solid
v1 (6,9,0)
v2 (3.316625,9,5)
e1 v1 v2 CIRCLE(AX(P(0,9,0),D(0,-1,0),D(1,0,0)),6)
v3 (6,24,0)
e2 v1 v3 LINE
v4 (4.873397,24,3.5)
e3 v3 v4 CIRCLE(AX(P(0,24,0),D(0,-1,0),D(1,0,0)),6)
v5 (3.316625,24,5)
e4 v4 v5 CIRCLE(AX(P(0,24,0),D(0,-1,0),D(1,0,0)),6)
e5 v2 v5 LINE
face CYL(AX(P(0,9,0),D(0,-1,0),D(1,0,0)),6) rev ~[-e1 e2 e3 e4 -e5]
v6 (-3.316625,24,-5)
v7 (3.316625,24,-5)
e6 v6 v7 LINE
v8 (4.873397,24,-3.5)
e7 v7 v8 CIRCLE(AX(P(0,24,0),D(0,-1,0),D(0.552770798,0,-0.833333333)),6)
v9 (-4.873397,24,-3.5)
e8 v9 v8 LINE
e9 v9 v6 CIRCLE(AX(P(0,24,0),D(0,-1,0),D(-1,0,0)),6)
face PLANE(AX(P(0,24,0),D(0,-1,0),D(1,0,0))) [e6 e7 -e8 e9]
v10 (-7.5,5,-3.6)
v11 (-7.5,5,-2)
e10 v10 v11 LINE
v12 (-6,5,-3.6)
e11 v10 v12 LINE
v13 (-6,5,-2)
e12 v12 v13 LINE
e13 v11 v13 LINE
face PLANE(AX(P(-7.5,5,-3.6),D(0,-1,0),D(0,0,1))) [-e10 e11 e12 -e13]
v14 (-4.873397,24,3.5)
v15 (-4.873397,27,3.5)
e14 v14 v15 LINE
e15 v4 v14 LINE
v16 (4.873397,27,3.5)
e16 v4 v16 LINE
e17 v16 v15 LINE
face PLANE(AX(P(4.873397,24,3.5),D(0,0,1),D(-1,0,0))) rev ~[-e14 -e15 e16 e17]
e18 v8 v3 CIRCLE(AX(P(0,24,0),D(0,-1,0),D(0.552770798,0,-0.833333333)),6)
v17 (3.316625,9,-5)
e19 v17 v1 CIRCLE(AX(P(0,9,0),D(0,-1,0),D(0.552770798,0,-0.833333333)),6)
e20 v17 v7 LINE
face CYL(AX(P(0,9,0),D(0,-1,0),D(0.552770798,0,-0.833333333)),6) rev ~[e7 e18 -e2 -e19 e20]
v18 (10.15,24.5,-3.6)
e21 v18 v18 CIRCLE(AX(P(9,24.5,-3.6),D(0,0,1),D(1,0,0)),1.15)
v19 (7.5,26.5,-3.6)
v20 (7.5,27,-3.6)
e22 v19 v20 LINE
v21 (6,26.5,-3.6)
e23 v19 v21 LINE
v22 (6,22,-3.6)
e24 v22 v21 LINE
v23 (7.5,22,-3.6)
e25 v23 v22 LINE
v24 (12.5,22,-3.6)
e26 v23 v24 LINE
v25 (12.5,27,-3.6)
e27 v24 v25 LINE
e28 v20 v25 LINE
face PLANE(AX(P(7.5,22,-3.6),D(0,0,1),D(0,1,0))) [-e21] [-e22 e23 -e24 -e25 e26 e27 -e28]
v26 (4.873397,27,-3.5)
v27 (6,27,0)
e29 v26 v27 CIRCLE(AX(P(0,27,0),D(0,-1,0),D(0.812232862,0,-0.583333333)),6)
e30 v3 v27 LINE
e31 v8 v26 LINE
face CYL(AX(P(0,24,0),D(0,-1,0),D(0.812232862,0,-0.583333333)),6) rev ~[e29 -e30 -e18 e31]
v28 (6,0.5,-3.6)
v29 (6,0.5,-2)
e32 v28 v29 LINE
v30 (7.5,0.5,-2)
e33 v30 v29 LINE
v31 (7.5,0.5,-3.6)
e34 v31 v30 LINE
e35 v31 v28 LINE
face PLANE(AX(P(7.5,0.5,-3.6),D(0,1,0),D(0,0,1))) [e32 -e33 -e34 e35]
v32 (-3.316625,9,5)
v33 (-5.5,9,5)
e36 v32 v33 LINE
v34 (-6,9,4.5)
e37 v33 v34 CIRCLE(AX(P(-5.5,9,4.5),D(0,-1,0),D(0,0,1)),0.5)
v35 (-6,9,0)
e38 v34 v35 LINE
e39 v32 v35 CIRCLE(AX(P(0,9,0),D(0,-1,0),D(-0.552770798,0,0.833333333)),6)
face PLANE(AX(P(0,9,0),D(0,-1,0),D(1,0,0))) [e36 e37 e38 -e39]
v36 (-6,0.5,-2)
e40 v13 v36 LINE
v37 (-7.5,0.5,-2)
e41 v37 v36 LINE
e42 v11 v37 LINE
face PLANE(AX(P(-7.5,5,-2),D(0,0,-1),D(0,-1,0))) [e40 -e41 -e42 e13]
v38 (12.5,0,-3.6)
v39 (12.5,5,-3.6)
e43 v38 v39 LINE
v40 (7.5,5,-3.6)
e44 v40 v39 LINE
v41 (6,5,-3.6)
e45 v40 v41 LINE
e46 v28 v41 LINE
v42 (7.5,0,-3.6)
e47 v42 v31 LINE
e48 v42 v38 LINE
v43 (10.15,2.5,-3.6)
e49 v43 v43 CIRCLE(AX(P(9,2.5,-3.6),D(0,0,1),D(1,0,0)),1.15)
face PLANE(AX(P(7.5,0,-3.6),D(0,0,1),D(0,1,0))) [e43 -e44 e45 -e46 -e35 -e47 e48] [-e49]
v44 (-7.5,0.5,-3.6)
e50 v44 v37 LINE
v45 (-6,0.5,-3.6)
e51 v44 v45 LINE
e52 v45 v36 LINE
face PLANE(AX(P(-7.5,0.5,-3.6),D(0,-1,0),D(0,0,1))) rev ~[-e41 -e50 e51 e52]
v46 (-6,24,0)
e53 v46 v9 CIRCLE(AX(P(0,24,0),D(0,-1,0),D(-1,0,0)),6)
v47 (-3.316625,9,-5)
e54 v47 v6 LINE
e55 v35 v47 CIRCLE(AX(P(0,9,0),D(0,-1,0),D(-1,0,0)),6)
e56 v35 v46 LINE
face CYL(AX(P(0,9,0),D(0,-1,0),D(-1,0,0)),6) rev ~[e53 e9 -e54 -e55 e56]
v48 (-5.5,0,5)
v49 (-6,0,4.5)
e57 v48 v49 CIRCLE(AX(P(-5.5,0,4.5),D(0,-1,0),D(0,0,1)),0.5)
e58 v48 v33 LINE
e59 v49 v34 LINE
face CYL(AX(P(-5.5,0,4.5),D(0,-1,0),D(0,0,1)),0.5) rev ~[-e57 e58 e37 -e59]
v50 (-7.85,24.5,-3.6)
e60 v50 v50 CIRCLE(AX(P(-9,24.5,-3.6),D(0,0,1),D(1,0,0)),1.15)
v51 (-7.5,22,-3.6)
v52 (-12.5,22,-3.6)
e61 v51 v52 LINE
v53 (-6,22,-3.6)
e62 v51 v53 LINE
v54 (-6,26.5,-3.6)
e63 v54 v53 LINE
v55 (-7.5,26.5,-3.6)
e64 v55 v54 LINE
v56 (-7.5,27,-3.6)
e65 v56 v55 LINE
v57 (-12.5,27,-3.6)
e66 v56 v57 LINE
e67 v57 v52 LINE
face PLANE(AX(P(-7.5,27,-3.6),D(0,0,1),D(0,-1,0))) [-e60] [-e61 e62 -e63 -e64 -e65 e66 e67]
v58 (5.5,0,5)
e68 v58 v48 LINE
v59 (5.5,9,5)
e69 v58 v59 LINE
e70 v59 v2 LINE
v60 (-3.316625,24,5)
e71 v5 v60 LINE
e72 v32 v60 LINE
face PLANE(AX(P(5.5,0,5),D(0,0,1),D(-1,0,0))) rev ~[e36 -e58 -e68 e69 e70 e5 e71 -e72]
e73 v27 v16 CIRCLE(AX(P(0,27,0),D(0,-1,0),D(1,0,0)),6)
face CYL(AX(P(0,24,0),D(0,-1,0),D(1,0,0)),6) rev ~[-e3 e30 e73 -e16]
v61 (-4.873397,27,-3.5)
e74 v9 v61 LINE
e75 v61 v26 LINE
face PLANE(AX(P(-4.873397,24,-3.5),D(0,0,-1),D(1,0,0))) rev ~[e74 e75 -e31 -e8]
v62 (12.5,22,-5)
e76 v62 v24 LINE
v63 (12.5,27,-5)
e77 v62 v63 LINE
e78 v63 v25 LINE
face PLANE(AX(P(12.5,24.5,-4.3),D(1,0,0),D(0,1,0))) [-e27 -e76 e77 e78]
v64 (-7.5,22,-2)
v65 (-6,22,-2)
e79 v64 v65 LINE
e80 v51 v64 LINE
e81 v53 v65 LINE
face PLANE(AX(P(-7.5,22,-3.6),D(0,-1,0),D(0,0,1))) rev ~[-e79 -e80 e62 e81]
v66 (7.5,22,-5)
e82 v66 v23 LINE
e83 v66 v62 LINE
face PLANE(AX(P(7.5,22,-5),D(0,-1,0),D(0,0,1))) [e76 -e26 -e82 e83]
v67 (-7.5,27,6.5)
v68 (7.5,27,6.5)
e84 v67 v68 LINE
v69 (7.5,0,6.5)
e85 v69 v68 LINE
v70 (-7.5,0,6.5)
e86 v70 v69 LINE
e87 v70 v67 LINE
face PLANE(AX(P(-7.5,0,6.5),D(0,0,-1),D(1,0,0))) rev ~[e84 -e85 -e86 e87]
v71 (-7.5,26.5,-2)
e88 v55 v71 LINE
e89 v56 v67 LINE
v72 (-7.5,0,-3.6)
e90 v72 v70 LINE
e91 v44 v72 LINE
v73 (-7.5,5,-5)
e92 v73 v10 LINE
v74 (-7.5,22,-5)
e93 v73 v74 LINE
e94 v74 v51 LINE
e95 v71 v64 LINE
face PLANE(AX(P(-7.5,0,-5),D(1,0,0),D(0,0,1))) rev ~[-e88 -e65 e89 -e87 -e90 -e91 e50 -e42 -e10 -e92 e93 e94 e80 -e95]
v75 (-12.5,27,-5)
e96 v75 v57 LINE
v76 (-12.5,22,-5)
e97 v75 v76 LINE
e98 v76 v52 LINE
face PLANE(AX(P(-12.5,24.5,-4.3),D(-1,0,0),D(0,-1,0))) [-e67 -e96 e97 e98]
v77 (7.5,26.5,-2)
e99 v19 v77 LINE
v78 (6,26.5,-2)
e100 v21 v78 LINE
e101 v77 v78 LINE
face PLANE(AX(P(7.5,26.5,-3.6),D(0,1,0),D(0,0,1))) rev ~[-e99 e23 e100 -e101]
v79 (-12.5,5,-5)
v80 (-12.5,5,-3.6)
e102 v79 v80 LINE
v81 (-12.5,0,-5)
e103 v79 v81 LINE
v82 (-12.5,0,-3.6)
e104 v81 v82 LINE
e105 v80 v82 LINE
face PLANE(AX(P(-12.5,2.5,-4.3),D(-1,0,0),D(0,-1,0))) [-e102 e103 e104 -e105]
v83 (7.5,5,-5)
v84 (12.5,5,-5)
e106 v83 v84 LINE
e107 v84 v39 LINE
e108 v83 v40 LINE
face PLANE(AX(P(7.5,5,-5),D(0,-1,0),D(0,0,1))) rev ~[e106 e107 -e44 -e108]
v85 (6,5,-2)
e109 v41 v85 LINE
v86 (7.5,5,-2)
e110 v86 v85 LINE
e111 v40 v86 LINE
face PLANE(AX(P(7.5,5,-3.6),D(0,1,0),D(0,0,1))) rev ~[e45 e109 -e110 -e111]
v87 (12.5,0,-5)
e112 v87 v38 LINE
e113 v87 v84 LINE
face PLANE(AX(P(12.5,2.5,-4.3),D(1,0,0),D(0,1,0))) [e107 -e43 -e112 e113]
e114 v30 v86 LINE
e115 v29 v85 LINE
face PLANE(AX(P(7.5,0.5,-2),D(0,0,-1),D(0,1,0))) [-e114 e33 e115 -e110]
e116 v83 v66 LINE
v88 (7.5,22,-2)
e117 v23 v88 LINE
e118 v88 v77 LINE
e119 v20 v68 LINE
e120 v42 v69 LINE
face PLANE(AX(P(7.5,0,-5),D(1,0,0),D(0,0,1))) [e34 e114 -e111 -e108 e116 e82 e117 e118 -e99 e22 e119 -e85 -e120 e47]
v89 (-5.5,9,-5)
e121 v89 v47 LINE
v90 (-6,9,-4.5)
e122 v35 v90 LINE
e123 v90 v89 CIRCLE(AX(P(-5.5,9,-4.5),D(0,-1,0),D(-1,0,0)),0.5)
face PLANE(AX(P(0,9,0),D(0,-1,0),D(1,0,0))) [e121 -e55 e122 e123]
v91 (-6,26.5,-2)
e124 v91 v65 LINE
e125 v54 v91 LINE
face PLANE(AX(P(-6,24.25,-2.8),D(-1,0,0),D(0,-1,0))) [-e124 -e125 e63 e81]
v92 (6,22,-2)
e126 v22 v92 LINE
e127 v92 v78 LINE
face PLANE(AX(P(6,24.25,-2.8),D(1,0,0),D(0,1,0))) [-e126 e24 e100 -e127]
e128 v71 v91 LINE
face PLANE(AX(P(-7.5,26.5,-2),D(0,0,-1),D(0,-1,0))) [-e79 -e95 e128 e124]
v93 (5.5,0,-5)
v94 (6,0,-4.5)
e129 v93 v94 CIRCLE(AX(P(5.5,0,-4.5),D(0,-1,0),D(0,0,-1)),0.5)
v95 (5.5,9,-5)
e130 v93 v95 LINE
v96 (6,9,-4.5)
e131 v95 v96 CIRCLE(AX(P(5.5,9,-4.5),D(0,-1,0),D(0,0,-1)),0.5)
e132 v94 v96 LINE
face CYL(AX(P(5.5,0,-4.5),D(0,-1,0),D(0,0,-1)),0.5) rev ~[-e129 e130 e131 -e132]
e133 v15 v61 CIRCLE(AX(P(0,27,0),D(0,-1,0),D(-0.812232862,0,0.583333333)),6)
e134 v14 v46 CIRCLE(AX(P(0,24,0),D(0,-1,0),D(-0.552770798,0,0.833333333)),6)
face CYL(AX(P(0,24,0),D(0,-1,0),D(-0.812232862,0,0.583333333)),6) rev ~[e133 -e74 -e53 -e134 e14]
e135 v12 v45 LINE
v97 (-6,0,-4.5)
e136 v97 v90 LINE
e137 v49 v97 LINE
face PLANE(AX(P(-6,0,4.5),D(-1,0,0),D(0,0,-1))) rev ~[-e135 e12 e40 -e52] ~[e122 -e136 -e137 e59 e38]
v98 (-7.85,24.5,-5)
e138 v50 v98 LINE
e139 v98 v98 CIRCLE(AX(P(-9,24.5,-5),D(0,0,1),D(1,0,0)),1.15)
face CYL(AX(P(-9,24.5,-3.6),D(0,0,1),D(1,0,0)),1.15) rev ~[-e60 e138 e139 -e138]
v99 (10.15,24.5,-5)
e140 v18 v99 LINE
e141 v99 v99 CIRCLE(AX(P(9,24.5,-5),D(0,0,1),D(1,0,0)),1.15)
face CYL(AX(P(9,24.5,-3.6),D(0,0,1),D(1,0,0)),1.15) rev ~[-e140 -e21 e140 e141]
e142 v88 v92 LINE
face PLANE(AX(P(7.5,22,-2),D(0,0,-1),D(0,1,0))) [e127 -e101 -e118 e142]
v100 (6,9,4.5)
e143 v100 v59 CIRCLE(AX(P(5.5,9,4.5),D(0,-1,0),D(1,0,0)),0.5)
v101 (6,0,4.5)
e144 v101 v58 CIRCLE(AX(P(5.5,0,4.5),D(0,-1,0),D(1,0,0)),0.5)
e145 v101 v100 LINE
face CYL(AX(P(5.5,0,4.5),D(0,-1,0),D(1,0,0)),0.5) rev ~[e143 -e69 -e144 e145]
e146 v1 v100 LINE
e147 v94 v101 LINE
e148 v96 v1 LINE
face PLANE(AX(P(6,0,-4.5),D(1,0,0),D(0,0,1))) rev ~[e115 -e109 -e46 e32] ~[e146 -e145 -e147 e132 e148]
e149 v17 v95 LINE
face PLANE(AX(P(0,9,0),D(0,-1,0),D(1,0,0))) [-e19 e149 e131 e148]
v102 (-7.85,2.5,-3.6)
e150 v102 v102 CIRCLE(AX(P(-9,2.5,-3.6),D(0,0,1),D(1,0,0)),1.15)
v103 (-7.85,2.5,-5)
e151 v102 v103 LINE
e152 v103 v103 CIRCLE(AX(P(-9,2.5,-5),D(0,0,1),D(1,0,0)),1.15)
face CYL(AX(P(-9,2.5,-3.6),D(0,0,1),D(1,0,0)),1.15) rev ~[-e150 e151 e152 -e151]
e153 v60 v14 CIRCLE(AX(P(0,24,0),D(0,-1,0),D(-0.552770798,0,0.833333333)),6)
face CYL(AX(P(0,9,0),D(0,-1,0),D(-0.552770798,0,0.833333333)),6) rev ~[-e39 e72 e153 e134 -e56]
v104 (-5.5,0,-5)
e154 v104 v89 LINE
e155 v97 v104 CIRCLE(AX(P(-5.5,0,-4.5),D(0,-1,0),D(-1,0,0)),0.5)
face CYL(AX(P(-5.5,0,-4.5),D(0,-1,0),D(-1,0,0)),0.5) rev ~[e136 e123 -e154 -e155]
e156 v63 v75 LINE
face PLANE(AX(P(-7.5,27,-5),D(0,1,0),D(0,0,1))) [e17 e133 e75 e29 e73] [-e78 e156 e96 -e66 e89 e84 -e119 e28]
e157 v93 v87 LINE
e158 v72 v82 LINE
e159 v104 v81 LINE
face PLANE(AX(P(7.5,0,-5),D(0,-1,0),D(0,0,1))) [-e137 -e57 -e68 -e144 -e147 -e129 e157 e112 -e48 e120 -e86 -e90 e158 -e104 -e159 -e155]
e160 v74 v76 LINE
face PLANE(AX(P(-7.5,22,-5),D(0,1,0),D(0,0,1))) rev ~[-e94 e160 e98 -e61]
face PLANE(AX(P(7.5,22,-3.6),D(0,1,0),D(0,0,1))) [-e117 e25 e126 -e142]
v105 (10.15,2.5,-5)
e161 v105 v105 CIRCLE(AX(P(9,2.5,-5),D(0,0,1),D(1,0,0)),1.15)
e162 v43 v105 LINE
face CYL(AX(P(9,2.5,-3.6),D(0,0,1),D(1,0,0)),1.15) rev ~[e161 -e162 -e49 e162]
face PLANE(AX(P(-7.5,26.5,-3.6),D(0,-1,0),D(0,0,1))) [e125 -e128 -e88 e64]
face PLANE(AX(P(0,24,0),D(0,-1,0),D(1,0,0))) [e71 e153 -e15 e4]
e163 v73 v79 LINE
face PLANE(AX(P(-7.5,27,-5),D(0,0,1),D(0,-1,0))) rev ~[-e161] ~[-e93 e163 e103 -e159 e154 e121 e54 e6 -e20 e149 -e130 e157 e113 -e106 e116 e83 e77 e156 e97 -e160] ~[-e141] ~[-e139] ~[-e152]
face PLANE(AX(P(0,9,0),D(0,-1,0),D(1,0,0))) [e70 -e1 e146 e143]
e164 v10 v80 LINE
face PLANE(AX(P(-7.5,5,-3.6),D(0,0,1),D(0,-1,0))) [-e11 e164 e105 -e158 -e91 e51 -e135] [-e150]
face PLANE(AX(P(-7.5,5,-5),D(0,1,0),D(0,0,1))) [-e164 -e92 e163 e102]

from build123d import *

# Parameters (mm, degrees)
F0_W      = 15
F0_H      = 11.5
F1_DEPTH  = 27
F3_DEPTH  = 9
F5_DEPTH  = 15
F7_DEPTH  = 3
F8_W      = 5
F8_H      = 1.4
F9_DEPTH  = 5
F10_R     = 1.15
F11_DEPTH = 1.4
F12_W     = 4.5
F12_H     = 1.6
F13_DEPTH = 1.5
F14_W     = 5
F14_H     = 1.4
F15_DEPTH = 5
F16_R     = 1.15
F17_DEPTH = 1.4
F18_W     = 4.5
F18_H     = 1.6
F19_DEPTH = 1.5


# Not quite as in the source:
# - a feature names something its author has since deleted; it is built from what else it names


with BuildPart() as f1:
    # F0 (on Front) → F1 (new body)
    with BuildSketch(Plane.XZ):
        with Locations((0, 0.75)):
            Rectangle(F0_W, F0_H)
    extrude(amount=-F1_DEPTH)

    # F2 (on Front) → F3 (cut)
    with BuildSketch(Plane.XZ):
        with BuildLine():
            Line((5.5, 5), (-5.5, 5))
            ThreePointArc((-5.5, 5), (-5.8535533906, 4.8535533906), (-6, 4.5))
            Line((-6, 4.5), (-6, -4.5))
            ThreePointArc((-6, -4.5), (-5.8535533906, -4.8535533906), (-5.5, -5))
            Line((-5.5, -5), (5.5, -5))
            ThreePointArc((5.5, -5), (5.8535533906, -4.8535533906), (6, -4.5))
            Line((6, -4.5), (6, 4.5))
            ThreePointArc((6, 4.5), (5.8535533906, 4.8535533906), (5.5, 5))
        make_face()
    extrude(amount=-F3_DEPTH, mode=Mode.SUBTRACT)

    # F4 (on face) → F5 (cut)
    with BuildSketch(Plane.XZ.offset(-9)):
        with BuildLine():
            Line((-3.3166247904, -5), (3.3166247904, -5))
            ThreePointArc((3.3166247904, -5), (5.2867640737, -2.8372743309), (6, 0))
            ThreePointArc((6, 0), (5.2867640737, 2.8372743309), (3.3166247904, 5))
            Line((3.3166247904, 5), (0, 5))
            Line((0, 5), (-3.3166247904, 5))
            ThreePointArc((-3.3166247904, 5), (-5.2867640737, 2.8372743309), (-6, 0))
            ThreePointArc((-6, 0), (-5.2867640737, -2.8372743309), (-3.3166247904, -5))
        make_face()
    extrude(amount=-F5_DEPTH, mode=Mode.SUBTRACT)

    # F6 (on face) → F7 (cut)
    with BuildSketch(Plane.XZ.offset(-24)):
        with BuildLine():
            ThreePointArc((4.8733971724, -3.5), (5.7114088907, -1.8384255445), (6, 0))
            ThreePointArc((6, 0), (5.7114088907, 1.8384255445), (4.8733971724, 3.5))
            Line((4.8733971724, 3.5), (0, 3.5))
            Line((0, 3.5), (-4.8733971724, 3.5))
            ThreePointArc((-4.8733971724, 3.5), (-6, 0), (-4.8733971724, -3.5))
            Line((-4.8733971724, -3.5), (4.8733971724, -3.5))
        make_face()
    extrude(amount=-F7_DEPTH, mode=Mode.SUBTRACT)

    # F8 (on face) → F9 (join)
    with BuildSketch(Plane.YZ.offset(7.5)):
        with Locations((2.5, -4.3)):
            Rectangle(F8_W, F8_H)
        with Locations((24.5, -4.3)):
            Rectangle(F8_W, F8_H)
    extrude(amount=F9_DEPTH)

    # F10 (on face) → F11 (cut)
    with BuildSketch(Plane.XY.offset(-3.6)):
        with Locations((9, 24.5)):
            Circle(F10_R)
        with Locations((9, 2.5)):
            Circle(F10_R)
    extrude(amount=-F11_DEPTH, mode=Mode.SUBTRACT)

    # F12 (on face) → F13 (cut)
    with BuildSketch(Plane.YZ.offset(7.5)):
        with Locations((2.75, -2.8)):
            Rectangle(F12_W, F12_H)
        with Locations((24.25, -2.8)):
            Rectangle(F12_W, F12_H)
    extrude(amount=-F13_DEPTH, mode=Mode.SUBTRACT)

    # F14 (on face) → F15 (join)
    with BuildSketch(Plane(origin=(-7.5, 0, 0), x_dir=(0, -1, 0), z_dir=(-1, 0, 0))):
        with Locations((-24.5, -4.3)):
            Rectangle(F14_W, F14_H)
        with Locations((-2.5, -4.3)):
            Rectangle(F14_W, F14_H)
    extrude(amount=F15_DEPTH)

    # F16 (on face) → F17 (cut)
    with BuildSketch(Plane.XY.offset(-3.6)):
        with Locations((-9, 2.5)):
            Circle(F16_R)
        with Locations((-9, 24.5)):
            Circle(F16_R)
    extrude(amount=-F17_DEPTH, mode=Mode.SUBTRACT)

    # F18 (on face) → F19 (cut)
    with BuildSketch(Plane(origin=(-7.5, 0, 0), x_dir=(0, -1, 0), z_dir=(-1, 0, 0))):
        with Locations((-24.25, -2.8)):
            Rectangle(F18_W, F18_H)
        with Locations((-2.75, -2.8)):
            Rectangle(F18_W, F18_H)
    extrude(amount=-F19_DEPTH, mode=Mode.SUBTRACT)


solid = f1.part
